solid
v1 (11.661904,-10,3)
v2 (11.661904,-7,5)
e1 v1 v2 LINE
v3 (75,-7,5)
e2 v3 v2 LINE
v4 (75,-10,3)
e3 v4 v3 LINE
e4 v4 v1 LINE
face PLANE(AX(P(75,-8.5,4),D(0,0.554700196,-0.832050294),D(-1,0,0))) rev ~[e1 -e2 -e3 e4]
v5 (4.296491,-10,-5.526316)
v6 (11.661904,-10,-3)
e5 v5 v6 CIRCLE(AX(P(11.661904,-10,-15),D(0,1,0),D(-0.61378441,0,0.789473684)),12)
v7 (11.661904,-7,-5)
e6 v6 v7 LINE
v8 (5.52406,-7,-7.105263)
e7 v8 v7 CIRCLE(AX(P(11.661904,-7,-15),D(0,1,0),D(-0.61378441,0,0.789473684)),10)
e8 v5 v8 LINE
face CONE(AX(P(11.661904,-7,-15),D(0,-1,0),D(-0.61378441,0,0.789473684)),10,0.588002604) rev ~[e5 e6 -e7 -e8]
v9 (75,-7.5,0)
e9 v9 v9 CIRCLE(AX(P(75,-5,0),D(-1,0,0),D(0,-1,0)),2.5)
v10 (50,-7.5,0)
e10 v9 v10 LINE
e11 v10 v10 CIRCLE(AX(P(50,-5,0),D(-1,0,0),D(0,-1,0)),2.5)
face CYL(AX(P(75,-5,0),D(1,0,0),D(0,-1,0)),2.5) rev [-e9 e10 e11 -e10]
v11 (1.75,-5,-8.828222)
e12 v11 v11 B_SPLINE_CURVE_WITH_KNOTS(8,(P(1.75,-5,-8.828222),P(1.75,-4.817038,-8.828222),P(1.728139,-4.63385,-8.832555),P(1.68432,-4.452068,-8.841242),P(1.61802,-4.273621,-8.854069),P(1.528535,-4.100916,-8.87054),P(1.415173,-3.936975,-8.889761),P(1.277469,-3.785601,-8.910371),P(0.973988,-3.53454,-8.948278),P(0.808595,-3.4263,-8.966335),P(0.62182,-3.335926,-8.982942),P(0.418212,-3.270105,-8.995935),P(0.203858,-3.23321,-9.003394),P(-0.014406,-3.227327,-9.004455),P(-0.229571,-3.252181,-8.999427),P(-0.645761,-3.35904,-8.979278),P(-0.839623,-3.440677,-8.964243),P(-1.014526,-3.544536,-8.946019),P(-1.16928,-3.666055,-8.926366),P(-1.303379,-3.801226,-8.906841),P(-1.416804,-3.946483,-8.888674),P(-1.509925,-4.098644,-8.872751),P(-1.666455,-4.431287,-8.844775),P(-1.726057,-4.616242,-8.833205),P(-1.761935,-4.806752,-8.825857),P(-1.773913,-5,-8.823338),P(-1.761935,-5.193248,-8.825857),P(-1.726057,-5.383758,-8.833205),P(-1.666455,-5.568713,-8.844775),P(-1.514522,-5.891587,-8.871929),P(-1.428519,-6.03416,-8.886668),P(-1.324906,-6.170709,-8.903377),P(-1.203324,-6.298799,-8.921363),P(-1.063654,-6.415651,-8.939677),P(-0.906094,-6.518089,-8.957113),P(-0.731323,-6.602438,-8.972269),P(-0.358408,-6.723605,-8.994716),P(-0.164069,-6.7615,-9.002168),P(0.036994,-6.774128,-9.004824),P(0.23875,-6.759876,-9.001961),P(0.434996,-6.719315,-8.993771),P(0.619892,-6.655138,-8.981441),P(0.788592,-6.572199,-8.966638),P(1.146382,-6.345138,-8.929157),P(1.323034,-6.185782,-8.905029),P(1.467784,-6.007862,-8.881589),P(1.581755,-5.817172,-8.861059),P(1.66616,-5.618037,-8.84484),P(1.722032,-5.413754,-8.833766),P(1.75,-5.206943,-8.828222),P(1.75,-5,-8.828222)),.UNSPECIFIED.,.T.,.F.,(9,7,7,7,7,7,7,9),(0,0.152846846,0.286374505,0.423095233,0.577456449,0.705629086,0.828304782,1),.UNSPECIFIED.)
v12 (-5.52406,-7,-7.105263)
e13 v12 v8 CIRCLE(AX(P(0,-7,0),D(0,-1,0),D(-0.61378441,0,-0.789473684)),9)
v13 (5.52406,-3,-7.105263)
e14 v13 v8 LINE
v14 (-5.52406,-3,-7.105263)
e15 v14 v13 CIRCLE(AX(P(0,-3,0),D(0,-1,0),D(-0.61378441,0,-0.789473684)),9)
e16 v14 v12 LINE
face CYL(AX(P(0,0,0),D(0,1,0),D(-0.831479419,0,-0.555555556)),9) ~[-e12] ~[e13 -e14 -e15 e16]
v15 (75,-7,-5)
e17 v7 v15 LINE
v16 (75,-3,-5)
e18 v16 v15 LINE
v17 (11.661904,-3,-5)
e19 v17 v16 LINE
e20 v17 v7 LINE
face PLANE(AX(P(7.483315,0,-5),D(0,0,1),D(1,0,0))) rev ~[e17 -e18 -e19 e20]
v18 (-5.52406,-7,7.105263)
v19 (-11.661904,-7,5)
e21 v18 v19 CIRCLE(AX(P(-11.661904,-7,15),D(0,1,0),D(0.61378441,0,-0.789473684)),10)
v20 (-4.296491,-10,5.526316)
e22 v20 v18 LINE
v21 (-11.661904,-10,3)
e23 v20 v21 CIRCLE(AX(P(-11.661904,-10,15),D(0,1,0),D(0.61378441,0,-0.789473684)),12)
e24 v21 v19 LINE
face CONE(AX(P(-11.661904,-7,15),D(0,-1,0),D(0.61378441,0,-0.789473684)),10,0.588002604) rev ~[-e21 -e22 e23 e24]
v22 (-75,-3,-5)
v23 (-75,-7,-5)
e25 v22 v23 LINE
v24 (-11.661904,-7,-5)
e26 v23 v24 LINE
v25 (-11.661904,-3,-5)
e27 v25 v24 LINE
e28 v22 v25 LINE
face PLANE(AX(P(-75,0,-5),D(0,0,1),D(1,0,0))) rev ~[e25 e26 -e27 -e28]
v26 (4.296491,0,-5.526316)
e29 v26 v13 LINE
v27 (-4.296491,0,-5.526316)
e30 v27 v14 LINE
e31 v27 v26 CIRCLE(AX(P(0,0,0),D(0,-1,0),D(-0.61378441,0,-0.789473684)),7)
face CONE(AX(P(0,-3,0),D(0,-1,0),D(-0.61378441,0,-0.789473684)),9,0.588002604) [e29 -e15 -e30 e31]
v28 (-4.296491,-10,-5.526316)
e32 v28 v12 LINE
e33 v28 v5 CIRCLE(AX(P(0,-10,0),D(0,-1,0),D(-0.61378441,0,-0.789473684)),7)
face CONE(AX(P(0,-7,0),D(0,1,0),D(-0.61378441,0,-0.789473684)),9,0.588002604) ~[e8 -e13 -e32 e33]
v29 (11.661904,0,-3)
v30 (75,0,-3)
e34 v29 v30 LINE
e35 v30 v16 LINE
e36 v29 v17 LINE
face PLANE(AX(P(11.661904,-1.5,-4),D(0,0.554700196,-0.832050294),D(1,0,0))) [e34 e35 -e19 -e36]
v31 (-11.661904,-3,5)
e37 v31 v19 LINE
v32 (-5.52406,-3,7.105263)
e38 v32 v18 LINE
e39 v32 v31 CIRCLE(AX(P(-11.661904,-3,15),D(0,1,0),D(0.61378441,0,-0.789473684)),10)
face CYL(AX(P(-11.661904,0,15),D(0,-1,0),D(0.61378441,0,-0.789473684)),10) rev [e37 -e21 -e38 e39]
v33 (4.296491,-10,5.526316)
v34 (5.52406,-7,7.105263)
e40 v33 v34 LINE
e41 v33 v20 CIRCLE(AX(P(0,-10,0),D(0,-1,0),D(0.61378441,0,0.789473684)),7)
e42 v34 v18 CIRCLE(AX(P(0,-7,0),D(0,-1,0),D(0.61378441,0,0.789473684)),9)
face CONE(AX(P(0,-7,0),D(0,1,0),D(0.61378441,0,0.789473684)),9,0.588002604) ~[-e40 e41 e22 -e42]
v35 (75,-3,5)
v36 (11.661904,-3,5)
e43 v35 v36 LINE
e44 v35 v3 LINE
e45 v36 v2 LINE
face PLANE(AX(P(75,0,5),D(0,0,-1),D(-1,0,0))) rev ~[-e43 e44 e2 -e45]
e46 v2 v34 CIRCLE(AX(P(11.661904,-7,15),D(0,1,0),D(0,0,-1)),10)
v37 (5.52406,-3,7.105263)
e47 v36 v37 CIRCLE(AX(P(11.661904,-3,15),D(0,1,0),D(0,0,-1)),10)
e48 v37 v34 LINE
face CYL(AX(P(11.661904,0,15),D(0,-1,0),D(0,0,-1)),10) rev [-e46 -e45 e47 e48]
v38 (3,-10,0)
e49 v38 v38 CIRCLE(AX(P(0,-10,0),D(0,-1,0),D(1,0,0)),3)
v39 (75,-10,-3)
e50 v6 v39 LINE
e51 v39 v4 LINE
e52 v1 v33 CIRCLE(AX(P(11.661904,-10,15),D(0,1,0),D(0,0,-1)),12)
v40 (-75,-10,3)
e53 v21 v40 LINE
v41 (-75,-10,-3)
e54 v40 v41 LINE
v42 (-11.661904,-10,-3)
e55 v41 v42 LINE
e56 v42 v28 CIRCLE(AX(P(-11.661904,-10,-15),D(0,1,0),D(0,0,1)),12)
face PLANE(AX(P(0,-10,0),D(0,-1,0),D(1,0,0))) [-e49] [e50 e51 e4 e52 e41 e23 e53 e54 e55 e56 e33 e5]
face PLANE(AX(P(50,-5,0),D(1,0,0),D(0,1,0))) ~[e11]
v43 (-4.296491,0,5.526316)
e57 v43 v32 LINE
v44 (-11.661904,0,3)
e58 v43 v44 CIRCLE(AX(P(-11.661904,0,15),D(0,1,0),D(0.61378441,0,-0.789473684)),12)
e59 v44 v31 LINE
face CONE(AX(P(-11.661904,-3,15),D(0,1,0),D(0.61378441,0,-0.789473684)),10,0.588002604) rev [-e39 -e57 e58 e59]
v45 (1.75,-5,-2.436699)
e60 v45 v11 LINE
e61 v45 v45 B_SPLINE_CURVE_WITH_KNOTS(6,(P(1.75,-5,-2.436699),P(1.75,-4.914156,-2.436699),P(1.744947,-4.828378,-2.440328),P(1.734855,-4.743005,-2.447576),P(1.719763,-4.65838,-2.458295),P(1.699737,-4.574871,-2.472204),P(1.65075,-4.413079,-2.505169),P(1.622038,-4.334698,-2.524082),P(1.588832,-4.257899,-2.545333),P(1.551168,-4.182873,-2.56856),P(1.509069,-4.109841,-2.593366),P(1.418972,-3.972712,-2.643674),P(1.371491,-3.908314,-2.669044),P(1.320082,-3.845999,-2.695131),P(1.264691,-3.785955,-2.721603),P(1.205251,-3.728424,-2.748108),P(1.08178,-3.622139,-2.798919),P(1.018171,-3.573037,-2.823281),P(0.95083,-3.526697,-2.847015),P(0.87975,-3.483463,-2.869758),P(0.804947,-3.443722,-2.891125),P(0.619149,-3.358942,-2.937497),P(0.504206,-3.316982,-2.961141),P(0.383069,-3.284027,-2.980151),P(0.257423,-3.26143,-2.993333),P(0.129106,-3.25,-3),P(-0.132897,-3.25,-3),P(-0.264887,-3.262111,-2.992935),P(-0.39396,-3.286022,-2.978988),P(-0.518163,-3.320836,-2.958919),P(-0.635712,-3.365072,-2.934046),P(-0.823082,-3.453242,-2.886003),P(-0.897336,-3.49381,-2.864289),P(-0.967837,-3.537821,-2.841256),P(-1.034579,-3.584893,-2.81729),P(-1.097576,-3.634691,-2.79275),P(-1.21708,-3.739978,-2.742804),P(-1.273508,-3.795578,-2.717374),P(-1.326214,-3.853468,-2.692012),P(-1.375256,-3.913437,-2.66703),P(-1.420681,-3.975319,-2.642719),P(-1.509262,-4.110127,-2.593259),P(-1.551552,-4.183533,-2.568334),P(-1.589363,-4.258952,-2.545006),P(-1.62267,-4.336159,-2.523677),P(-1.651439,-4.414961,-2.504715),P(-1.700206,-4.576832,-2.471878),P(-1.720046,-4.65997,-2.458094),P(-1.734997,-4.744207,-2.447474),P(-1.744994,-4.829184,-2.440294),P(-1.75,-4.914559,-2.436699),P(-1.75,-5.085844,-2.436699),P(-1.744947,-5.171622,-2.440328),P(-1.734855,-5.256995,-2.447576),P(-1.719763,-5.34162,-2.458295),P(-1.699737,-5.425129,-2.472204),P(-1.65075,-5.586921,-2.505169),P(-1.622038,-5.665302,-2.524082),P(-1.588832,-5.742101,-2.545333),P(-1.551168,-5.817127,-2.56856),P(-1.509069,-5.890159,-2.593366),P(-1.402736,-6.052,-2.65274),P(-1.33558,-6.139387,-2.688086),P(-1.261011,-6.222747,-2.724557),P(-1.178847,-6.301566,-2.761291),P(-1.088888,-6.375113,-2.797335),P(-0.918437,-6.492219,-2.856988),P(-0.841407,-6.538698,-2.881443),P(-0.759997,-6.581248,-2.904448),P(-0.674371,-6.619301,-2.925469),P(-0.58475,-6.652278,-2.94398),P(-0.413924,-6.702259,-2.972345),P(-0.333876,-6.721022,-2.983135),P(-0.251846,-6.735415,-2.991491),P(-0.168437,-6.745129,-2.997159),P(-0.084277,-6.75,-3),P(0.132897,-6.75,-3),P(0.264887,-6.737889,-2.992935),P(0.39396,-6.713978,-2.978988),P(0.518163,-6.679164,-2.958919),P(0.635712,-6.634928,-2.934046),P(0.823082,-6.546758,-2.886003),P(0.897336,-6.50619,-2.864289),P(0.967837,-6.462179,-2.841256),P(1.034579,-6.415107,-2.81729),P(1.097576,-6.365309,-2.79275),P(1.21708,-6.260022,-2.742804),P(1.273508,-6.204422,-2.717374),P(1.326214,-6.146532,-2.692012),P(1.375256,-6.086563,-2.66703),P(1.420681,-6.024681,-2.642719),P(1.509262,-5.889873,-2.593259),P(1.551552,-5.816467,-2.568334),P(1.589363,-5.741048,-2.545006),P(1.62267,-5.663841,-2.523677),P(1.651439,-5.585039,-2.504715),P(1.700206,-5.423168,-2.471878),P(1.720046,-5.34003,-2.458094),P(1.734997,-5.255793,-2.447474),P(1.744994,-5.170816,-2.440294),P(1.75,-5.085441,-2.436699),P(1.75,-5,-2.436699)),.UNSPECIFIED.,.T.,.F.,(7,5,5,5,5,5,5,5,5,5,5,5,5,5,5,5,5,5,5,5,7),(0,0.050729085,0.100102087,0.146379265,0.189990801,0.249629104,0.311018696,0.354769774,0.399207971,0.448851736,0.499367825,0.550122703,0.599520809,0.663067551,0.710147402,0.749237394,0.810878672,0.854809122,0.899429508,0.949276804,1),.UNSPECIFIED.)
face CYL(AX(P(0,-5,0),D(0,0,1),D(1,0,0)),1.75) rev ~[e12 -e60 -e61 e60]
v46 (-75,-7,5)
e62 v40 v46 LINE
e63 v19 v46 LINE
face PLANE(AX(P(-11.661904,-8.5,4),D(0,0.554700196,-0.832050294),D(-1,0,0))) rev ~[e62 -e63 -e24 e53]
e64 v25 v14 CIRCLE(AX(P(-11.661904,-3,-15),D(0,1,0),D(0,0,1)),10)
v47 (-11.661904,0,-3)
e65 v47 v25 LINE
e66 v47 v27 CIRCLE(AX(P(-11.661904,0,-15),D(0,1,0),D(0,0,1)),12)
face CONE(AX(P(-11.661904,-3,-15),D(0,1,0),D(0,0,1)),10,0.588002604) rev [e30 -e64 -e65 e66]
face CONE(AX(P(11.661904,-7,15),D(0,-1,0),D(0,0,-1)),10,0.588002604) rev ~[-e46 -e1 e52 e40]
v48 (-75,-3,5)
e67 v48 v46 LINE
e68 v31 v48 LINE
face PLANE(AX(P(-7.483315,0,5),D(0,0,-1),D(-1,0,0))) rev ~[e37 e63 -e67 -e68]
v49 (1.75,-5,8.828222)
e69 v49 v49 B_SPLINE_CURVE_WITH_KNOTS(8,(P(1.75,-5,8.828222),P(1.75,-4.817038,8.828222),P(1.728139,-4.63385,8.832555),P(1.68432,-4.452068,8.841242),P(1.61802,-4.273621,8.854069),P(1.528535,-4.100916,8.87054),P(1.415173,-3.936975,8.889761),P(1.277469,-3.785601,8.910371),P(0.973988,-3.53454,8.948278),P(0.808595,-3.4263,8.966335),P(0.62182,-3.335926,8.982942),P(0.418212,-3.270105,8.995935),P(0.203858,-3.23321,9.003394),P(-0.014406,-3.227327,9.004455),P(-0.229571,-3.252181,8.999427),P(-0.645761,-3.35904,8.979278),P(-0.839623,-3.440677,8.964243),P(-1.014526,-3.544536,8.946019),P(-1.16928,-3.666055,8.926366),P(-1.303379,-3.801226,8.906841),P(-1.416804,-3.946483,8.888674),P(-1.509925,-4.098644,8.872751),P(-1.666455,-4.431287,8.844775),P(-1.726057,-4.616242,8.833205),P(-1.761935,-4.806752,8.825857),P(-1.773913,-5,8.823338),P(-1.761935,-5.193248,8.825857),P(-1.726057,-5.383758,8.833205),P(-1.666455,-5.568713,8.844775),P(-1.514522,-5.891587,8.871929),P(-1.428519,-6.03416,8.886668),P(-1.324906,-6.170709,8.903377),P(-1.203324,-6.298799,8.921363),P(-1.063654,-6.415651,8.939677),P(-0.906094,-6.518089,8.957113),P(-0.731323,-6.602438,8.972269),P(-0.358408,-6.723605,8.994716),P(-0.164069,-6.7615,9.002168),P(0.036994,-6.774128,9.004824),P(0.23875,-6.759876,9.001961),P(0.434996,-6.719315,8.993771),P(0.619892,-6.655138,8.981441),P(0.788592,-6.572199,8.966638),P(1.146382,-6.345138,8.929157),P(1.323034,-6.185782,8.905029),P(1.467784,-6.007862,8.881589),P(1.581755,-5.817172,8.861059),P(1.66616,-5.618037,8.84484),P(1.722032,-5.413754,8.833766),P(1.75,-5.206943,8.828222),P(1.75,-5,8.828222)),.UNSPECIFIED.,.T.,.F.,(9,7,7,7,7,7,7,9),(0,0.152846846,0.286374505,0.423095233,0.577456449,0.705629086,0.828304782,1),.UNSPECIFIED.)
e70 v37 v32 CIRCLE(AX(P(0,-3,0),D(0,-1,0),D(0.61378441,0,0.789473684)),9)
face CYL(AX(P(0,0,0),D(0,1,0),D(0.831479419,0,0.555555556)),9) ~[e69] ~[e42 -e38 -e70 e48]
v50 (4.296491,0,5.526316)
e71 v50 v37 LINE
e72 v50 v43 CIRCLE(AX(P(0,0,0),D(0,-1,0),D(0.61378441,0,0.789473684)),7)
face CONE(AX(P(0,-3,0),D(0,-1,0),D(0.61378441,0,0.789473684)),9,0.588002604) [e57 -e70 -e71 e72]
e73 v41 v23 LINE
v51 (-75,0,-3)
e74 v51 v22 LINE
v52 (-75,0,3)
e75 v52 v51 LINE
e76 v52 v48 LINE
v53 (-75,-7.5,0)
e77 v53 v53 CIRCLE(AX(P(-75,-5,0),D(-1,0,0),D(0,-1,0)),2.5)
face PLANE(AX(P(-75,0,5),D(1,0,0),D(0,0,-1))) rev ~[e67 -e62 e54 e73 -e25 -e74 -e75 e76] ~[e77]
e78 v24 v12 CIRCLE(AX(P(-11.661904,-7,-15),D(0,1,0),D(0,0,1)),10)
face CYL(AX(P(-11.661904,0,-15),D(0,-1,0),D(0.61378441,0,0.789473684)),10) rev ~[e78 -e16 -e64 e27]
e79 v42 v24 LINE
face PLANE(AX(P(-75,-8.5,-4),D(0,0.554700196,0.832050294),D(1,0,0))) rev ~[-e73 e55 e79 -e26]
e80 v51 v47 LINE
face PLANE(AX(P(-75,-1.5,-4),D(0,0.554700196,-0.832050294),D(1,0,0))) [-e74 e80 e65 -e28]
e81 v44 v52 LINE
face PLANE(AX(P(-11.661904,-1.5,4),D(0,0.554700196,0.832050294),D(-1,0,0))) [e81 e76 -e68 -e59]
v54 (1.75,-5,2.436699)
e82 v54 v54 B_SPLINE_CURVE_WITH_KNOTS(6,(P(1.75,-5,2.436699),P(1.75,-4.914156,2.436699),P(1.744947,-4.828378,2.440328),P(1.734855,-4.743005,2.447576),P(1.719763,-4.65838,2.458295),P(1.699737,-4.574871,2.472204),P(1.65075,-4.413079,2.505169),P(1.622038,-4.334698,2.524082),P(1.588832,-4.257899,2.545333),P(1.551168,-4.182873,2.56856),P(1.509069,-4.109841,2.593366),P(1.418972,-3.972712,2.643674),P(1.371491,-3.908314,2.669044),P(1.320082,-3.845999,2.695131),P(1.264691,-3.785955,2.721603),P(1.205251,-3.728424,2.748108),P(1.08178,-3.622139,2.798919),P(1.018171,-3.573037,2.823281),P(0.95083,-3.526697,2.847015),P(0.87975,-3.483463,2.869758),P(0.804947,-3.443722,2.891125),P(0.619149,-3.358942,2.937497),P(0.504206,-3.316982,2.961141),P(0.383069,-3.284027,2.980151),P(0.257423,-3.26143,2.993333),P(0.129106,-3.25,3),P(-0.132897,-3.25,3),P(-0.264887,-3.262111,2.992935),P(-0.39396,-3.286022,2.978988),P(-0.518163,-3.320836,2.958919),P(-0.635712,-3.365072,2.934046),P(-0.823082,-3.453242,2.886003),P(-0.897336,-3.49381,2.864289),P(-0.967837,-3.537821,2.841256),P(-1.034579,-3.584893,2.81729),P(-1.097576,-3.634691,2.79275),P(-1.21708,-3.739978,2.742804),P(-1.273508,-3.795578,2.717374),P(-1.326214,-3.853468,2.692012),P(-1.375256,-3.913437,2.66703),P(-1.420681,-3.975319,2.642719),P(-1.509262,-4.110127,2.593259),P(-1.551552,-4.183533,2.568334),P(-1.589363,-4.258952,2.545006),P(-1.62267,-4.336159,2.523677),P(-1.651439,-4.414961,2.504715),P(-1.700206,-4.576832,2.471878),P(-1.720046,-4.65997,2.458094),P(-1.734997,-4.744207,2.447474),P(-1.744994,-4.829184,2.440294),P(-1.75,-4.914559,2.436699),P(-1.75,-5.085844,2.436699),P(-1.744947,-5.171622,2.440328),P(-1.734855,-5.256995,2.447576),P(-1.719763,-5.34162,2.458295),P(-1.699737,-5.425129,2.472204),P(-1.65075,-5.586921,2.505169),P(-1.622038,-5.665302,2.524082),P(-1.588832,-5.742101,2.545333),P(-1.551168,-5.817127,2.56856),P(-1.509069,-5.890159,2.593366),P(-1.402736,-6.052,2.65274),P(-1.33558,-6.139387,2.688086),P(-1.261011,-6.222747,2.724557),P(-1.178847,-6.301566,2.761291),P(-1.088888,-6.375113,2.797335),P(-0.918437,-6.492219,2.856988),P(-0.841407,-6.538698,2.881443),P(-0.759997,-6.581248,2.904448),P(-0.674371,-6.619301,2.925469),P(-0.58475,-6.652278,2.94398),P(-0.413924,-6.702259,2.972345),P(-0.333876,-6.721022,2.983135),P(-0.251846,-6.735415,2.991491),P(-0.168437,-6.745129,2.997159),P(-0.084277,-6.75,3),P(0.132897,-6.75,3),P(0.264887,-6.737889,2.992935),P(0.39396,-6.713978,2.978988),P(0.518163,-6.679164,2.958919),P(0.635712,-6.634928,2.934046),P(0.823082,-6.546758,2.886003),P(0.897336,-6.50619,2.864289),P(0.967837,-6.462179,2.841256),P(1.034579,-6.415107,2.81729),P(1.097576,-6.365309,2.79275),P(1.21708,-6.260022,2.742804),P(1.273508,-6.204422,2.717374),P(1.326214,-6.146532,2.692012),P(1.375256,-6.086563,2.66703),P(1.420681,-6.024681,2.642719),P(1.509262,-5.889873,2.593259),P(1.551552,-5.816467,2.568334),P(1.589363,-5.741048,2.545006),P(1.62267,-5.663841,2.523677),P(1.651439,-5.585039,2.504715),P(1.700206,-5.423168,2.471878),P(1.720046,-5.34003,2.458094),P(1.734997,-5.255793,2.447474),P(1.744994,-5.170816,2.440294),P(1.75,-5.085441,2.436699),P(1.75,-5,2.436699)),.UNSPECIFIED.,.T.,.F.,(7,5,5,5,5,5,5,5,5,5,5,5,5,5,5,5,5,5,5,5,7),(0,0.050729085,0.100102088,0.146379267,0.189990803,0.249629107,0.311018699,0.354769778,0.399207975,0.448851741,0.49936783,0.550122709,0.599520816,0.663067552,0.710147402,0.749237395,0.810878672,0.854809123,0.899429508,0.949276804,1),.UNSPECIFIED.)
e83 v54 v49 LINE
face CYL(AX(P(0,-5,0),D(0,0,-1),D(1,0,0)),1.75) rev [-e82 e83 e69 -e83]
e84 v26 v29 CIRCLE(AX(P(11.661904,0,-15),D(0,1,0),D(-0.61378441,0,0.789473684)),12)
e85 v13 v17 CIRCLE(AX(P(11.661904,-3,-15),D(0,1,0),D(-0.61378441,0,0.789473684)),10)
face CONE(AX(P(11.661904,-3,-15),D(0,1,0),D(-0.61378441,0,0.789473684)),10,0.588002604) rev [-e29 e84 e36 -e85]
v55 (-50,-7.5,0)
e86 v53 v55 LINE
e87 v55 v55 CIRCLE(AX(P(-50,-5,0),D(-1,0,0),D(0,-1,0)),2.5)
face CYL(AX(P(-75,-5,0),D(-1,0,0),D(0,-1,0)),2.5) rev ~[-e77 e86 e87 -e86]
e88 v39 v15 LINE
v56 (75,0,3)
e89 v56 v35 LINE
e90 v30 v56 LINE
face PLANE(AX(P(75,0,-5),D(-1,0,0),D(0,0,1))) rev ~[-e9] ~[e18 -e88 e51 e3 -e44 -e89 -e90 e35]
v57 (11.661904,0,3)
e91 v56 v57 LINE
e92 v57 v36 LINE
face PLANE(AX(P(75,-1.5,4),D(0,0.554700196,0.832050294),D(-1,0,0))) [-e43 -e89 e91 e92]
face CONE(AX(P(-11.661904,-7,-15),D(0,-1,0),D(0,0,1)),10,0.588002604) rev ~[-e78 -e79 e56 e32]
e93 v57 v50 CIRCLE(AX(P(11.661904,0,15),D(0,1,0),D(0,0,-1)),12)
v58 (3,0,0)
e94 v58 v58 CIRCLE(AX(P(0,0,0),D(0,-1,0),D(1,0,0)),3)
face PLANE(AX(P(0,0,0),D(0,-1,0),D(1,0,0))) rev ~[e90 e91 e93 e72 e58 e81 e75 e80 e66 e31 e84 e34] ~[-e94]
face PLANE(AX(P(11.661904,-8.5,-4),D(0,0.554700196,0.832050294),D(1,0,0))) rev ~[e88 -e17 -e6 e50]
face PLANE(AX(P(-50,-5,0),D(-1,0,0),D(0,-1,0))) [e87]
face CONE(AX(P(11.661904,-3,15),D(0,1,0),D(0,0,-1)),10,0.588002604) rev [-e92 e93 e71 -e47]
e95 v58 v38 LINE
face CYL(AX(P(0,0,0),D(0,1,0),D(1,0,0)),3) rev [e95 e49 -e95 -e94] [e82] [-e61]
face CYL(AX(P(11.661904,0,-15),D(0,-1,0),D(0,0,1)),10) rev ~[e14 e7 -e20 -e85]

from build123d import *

# Parameters (mm, degrees)
F0_R          = 3
F1_DEPTH      = 10
F2_R          = 2.5
F3_DEPTH      = 25
F4_R          = 1.75
F5_DEPTH      = 9.001
F5_DEPTH_BACK = 9.001
F6_R          = 10
F7_SIZE2      = 3
F7_SIZE       = 2
F7_2_SIZE2    = 3
F7_2_SIZE     = 2


# Not quite as in the source:
# - a pattern or mirror of a feature is missing from the dataset's text; its kind, count and spacing are read off the source's solid


with BuildPart() as f1:
    # F0 (on Front) → F1 (new body)
    with BuildSketch(Plane.XZ):
        with BuildLine():
            Line((75, 5), (7.4833147735, 5))
            ThreePointArc((7.4833147735, 5), (0, 9), (-7.4833147735, 5))
            Line((-7.4833147735, 5), (-75, 5))
            Line((-75, 5), (-75, -5))
            Line((-75, -5), (-7.4833147735, -5))
            ThreePointArc((-7.4833147735, -5), (0, -9), (7.4833147735, -5))
            Line((7.4833147735, -5), (75, -5))
            Line((75, -5), (75, 5))
        make_face()
        Circle(F0_R, mode=Mode.SUBTRACT)
    extrude(amount=F1_DEPTH)

    # F2 (on face) → F3 (cut)
    with BuildSketch(Plane(origin=(-75, 0, 0), x_dir=(0, -1, 0), z_dir=(-1, 0, 0))):
        with Locations((5, 0)):
            Circle(F2_R)
    f3 = extrude(amount=-F3_DEPTH, mode=Mode.SUBTRACT)

    # F3_copies: F3 across plane
    add(f3.mirror(Plane(origin=(0, 0, 0), x_dir=(0, 0, 1), z_dir=(1, 0, 0))), mode=Mode.SUBTRACT)

    # F4 (on Top) → F5 (cut, two sides)
    with BuildSketch(Plane.XY) as f5_sk:
        with Locations((0, -5)):
            Circle(F4_R)
    extrude(amount=-F5_DEPTH, mode=Mode.SUBTRACT)
    extrude(f5_sk.sketch, amount=F5_DEPTH_BACK, mode=Mode.SUBTRACT)

    # F6
    f6_edges = [f1.edges().sort_by_distance(p)[0] for p in [
        (-7.483315, -5, 5),
        (7.483315, -5, 5),
        (7.483315, -5, -5),
        (-7.483315, -5, -5),
    ]]
    fillet(f6_edges, radius=F6_R)

    # F7
    f7_edges = [f1.edges().sort_by_distance(p)[0] for p in [
        (-43.330952, -10, 5),
        (-43.330952, -10, -5),
    ]]
    f7_side = f1.faces().sort_by_distance((43.330952, -10, -3.489239))[0]
    chamfer(f7_edges, length=F7_SIZE, length2=F7_SIZE2, reference=f7_side)

    # F7#2
    f7_2_edges = [f1.edges().sort_by_distance(p)[0] for p in [
        (-43.330952, 0, 5),
        (-43.330952, 0, -5),
    ]]
    f7_2_side = f1.faces().sort_by_distance((43.330952, 0, -3.489239))[0]
    chamfer(f7_2_edges, length=F7_2_SIZE, length2=F7_2_SIZE2, reference=f7_2_side)


solid = f1.part
